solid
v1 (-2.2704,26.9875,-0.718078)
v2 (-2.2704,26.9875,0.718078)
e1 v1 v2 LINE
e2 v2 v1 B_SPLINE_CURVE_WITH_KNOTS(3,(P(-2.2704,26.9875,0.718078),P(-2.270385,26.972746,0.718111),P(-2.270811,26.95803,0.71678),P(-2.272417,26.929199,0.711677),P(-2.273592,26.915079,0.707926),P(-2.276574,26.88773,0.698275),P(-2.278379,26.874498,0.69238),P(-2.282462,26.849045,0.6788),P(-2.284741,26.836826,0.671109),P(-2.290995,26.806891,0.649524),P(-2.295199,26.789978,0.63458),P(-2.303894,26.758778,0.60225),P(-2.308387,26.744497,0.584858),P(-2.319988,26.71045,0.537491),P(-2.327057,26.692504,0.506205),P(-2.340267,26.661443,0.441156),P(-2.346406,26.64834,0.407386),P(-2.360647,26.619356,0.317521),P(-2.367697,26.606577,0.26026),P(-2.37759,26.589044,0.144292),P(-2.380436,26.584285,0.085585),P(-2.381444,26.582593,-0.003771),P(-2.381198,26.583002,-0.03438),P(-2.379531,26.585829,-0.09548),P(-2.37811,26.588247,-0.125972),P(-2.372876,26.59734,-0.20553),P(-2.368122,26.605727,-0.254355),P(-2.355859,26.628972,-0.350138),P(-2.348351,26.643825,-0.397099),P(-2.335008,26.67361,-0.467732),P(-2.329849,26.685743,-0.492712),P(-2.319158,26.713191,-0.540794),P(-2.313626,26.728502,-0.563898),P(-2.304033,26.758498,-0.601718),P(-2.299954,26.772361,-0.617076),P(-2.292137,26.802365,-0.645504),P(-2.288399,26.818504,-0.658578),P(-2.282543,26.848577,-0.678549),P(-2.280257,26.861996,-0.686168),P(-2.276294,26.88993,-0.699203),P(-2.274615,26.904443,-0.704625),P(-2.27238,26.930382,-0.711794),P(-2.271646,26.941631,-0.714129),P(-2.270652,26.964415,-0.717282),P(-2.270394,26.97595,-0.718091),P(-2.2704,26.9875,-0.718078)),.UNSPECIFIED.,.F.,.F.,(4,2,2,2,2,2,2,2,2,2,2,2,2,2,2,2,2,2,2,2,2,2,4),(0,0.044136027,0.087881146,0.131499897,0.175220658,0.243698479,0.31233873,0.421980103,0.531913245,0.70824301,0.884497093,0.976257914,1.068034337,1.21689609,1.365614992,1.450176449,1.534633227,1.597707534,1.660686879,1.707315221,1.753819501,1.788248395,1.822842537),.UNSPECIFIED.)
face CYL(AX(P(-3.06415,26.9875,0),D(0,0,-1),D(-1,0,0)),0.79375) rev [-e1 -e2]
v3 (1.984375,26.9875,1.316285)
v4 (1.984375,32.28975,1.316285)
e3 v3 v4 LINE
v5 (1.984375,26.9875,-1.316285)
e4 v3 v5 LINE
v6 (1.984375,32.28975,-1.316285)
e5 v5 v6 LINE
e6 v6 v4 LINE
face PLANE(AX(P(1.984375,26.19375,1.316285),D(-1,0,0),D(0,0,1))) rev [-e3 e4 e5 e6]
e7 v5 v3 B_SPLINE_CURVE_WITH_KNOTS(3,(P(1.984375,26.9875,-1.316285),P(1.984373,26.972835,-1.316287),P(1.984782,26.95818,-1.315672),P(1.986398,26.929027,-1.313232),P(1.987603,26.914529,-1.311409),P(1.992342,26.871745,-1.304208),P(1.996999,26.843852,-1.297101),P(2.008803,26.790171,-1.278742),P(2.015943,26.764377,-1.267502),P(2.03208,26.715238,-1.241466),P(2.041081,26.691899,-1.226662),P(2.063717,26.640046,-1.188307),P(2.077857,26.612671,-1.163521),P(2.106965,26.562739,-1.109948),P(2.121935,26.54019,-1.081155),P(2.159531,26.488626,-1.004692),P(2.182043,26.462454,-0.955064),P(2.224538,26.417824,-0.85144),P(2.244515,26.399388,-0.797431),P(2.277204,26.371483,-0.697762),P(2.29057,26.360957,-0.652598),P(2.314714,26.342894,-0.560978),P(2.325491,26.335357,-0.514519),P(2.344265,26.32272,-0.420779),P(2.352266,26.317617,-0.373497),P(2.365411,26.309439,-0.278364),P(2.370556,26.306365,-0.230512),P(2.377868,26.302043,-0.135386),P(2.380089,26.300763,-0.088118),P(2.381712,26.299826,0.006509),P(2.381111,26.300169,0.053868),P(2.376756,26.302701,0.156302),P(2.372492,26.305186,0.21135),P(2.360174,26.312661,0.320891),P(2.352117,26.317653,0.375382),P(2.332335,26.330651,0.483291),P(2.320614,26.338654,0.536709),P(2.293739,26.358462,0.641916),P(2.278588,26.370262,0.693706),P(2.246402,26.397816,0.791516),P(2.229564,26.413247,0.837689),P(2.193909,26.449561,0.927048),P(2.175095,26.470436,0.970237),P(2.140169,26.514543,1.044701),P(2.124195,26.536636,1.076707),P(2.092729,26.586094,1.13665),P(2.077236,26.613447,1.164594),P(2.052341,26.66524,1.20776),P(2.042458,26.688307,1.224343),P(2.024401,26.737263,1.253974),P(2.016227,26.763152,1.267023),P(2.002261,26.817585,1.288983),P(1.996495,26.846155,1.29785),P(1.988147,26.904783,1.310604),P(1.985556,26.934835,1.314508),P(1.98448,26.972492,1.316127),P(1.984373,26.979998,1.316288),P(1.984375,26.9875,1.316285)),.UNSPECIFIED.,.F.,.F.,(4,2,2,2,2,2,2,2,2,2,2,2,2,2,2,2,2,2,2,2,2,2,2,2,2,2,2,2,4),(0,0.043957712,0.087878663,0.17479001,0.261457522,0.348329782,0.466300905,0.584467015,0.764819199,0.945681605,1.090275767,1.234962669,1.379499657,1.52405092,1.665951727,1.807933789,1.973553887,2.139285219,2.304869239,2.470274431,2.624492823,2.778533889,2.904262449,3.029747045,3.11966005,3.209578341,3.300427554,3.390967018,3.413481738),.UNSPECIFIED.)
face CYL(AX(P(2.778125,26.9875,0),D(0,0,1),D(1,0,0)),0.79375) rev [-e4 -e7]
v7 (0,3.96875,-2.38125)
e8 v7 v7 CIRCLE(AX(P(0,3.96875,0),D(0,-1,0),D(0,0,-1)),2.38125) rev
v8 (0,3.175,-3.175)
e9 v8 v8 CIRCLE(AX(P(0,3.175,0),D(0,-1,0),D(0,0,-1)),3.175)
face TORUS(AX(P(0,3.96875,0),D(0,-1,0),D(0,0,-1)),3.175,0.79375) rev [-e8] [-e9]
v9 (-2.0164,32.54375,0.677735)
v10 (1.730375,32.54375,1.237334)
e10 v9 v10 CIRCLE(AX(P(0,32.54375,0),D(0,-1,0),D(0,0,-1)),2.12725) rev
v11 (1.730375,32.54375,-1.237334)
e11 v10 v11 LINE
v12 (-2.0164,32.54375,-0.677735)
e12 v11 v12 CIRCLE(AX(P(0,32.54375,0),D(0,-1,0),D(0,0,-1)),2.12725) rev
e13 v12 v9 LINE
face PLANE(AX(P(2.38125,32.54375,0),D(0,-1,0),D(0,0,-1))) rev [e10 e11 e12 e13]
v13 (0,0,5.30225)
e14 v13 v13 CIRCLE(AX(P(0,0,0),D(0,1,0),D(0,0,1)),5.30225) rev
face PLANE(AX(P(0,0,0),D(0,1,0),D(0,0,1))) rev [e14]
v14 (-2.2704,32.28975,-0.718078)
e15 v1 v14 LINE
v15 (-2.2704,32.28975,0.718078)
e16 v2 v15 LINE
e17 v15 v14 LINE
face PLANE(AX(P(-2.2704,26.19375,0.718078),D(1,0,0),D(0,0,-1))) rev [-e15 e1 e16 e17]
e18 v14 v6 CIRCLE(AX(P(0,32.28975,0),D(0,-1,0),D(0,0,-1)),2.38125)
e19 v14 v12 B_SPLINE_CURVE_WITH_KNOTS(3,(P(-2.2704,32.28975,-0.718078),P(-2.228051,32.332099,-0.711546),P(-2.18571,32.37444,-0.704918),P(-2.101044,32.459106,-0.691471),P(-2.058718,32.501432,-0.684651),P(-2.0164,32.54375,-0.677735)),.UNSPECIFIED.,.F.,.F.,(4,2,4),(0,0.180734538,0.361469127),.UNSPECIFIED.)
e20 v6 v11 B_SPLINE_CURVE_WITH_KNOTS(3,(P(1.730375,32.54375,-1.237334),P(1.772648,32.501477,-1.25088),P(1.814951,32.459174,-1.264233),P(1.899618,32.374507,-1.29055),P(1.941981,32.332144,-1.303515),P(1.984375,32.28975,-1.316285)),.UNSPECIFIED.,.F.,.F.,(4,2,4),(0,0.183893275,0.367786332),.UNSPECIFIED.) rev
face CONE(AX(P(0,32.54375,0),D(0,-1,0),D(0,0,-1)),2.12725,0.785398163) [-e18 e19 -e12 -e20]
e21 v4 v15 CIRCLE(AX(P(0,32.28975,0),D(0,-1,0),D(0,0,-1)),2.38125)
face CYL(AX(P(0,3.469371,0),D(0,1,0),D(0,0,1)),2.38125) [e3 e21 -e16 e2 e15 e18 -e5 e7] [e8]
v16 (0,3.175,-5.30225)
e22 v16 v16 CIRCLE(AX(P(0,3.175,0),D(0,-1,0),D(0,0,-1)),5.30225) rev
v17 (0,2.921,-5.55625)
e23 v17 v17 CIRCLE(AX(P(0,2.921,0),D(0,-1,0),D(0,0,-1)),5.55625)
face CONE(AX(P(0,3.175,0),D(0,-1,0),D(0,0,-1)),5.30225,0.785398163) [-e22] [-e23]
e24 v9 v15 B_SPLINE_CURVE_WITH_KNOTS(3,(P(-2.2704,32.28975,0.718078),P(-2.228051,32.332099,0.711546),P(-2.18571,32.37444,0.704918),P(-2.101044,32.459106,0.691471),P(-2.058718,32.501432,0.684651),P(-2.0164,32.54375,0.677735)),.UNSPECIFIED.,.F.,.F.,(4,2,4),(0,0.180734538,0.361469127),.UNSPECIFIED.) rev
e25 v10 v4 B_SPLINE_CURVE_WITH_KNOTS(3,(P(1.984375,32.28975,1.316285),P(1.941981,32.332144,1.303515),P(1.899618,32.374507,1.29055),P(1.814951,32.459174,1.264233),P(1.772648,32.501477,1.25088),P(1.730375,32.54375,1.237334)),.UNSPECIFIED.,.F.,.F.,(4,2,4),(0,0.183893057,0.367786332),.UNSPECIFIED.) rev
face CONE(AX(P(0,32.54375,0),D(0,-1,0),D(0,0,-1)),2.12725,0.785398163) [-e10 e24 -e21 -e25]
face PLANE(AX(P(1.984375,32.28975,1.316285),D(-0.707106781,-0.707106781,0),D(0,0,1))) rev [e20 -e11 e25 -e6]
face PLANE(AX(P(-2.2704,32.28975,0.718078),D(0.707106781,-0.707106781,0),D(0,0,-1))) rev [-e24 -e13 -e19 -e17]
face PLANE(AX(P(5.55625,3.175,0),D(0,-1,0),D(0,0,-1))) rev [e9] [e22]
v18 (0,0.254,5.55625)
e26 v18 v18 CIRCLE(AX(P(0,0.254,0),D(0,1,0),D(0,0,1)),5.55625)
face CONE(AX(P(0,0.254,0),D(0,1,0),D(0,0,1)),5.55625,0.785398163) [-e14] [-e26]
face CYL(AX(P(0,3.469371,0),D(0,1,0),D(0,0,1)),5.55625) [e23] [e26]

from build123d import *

# Parameters (mm, degrees)
CUT_EXTRUDE1_DEPTH = 6.35
FILLET1_R          = 0.79375
FILLET2_R          = 0.79375
CHAMFER1_SIZE      = 0.254


with BuildPart() as part:
    # Sketch1 → Revolve1 (revolve)
    with BuildSketch(Plane.XY, mode=Mode.PRIVATE) as revolve1_sk:
        Polygon((0, 0), (5.55625, 0), (5.55625, 3.175), (2.38125, 3.175), (2.38125, 32.54375), (0, 32.54375), align=None)
    revolve(revolve1_sk.sketch.rotate(Axis((0, 3.469370861, 0), (0, -1, 0)), 90), axis=Axis((0, 3.469370861, 0), (0, -1, 0)))

    # Sketch4 → Cut-Extrude1 (cut)
    with BuildSketch(Plane(origin=(0, 32.54375, 0), x_dir=(1, 0, 0), z_dir=(0, 1, 0))):
        with BuildLine():
            Line((-2.270399729, -0.71807843), (-2.270399729, 0.71807843))
            ThreePointArc((-2.270399729, 0.71807843), (-2.38125, 0), (-2.270399729, -0.71807843))
        make_face()
        with BuildLine():
            Line((1.984375, -1.316285464), (1.984375, 1.316285464))
            ThreePointArc((1.984375, 1.316285464), (2.38125, 0), (1.984375, -1.316285464))
        make_face()
    extrude(amount=-CUT_EXTRUDE1_DEPTH, mode=Mode.SUBTRACT)

    # Fillet1
    fillet1_edges = [part.edges().sort_by_distance(p)[0] for p in [
        (0, 3.175, -2.38125),
    ]]
    fillet(fillet1_edges, radius=FILLET1_R)

    # Fillet2
    # the kernel refuses this fillet: 0.79375 mm, written as the material it adds along each edge
    with BuildSketch(Plane(origin=(1.984375, 26.19375, 3.300660464), x_dir=(0, 1, 0), z_dir=(0, 0, -1))) as fillet2_piece_1_section:
        with BuildLine():
            CenterArc((FILLET2_R, FILLET2_R), FILLET2_R, 180, 90)
            Line((0, FILLET2_R), (0, 0))
            Line((0, 0), (FILLET2_R, 0))
        make_face()
    fillet2_piece_1 = extrude(amount=6.601320927, mode=Mode.PRIVATE)
    fillet2_piece_1 = fillet2_piece_1 & Plane(origin=(0, 26.406315187, 0), x_dir=(0, 0, 1), z_dir=(0, 1, 0)) * Cylinder(2.38125, 17, mode=Mode.PRIVATE)
    add(fillet2_piece_1)
    with BuildSketch(Plane(origin=(-2.270399729, 26.19375, 2.70245343), x_dir=(0, 1, 0), z_dir=(0, 0, -1))) as fillet2_piece_2_section:
        with BuildLine():
            CenterArc((FILLET2_R, -FILLET2_R), FILLET2_R, 90, 90)
            Line((0, -FILLET2_R), (0, 0))
            Line((0, 0), (FILLET2_R, 0))
        make_face()
    fillet2_piece_2 = extrude(amount=5.404906861, mode=Mode.PRIVATE)
    fillet2_piece_2 = fillet2_piece_2 & Plane(origin=(0, 26.476974143, 0), x_dir=(0, 0, 1), z_dir=(0, 1, 0)) * Cylinder(2.38125, 14, mode=Mode.PRIVATE)
    add(fillet2_piece_2)

    # Chamfer1
    # the kernel refuses this chamfer: 0.254 mm, written as the material it takes off along each edge
    with BuildSketch(Plane(origin=(0, 32.54375, 0), x_dir=(-0.9994949156693064, 0, -0.03177913704312948), z_dir=(-0.03177913704312948, 0, 0.9994949156693064))) as chamfer1_piece_1:
        Polygon((2.38125, CHAMFER1_SIZE), (2.38125 - CHAMFER1_SIZE, 0), (2.38125, 0), align=None)
    revolve(axis=Axis((0, 32.54375, 0), (0, -1, 0)), revolution_arc=160.351494941, mode=Mode.SUBTRACT)
    with BuildSketch(Plane(origin=(0, 32.54375, 0), x_dir=(0, 0, 1), z_dir=(1, 0, 0))) as chamfer1_piece_2:
        Polygon((2.38125, CHAMFER1_SIZE), (2.38125 - CHAMFER1_SIZE, 0), (2.38125, 0), align=None)
    revolve(axis=Axis((0, 32.54375, 0), (0, -1, 0)), revolution_arc=88.170020766, mode=Mode.SUBTRACT)
    with BuildSketch(Plane(origin=(1.984375, 32.54375, 1.969492943), x_dir=(-0.9996219169112972, 0.027495876610573698, 0), z_dir=(0, 0, -1))) as chamfer1_piece_3:
        Polygon((CHAMFER1_SIZE * 0.999621916911, -CHAMFER1_SIZE * 0.0274958766106), (-CHAMFER1_SIZE * 0.0274958766106, -CHAMFER1_SIZE * 0.999621916911), (0, 0), align=None)
    extrude(amount=3.938985885, mode=Mode.SUBTRACT)
    with BuildSketch(Plane(origin=(-2.270399729, 32.54375, 1.371285909), x_dir=(-0.027495876610587867, -0.9996219169112968, 0), z_dir=(0, 0, -1))) as chamfer1_piece_4:
        Polygon((CHAMFER1_SIZE * 0.999621916911, -CHAMFER1_SIZE * 0.0274958766106), (-CHAMFER1_SIZE * 0.0274958766106, -CHAMFER1_SIZE * 0.999621916911), (0, 0), align=None)
    extrude(amount=2.742571819, mode=Mode.SUBTRACT)
    with BuildSketch(Plane(origin=(0, 3.175, 0), x_dir=(0, 0, 1), z_dir=(1, 0, 0))) as chamfer1_piece_5:
        Polygon((5.55625 - CHAMFER1_SIZE, 0), (5.55625, CHAMFER1_SIZE), (5.55625, 0), align=None)
    revolve(axis=Axis((0, 3.175, 0), (0, -1, 0)), mode=Mode.SUBTRACT)
    with BuildSketch(Plane(origin=(0, 0, 0), x_dir=(0, 0, 1), z_dir=(1, 0, 0))) as chamfer1_piece_6:
        Polygon((5.55625, -CHAMFER1_SIZE), (5.55625 - CHAMFER1_SIZE, 0), (5.55625, 0), align=None)
    revolve(axis=Axis((0, 0, 0), (0, -1, 0)), mode=Mode.SUBTRACT)
    with BuildSketch(Plane(origin=(0, 32.54375, 0), x_dir=(0.9519271960907222, 0, 0.3063243596954961), z_dir=(0.3063243596954961, 0, -0.9519271960907222))) as chamfer1_piece_7:
        Polygon((2.38125, CHAMFER1_SIZE), (2.38125 - CHAMFER1_SIZE, 0), (2.38125, 0), align=None)
    revolve(axis=Axis((0, 32.54375, 0), (0, -1, 0)), revolution_arc=72.162141692, mode=Mode.SUBTRACT)


solid = part.part
